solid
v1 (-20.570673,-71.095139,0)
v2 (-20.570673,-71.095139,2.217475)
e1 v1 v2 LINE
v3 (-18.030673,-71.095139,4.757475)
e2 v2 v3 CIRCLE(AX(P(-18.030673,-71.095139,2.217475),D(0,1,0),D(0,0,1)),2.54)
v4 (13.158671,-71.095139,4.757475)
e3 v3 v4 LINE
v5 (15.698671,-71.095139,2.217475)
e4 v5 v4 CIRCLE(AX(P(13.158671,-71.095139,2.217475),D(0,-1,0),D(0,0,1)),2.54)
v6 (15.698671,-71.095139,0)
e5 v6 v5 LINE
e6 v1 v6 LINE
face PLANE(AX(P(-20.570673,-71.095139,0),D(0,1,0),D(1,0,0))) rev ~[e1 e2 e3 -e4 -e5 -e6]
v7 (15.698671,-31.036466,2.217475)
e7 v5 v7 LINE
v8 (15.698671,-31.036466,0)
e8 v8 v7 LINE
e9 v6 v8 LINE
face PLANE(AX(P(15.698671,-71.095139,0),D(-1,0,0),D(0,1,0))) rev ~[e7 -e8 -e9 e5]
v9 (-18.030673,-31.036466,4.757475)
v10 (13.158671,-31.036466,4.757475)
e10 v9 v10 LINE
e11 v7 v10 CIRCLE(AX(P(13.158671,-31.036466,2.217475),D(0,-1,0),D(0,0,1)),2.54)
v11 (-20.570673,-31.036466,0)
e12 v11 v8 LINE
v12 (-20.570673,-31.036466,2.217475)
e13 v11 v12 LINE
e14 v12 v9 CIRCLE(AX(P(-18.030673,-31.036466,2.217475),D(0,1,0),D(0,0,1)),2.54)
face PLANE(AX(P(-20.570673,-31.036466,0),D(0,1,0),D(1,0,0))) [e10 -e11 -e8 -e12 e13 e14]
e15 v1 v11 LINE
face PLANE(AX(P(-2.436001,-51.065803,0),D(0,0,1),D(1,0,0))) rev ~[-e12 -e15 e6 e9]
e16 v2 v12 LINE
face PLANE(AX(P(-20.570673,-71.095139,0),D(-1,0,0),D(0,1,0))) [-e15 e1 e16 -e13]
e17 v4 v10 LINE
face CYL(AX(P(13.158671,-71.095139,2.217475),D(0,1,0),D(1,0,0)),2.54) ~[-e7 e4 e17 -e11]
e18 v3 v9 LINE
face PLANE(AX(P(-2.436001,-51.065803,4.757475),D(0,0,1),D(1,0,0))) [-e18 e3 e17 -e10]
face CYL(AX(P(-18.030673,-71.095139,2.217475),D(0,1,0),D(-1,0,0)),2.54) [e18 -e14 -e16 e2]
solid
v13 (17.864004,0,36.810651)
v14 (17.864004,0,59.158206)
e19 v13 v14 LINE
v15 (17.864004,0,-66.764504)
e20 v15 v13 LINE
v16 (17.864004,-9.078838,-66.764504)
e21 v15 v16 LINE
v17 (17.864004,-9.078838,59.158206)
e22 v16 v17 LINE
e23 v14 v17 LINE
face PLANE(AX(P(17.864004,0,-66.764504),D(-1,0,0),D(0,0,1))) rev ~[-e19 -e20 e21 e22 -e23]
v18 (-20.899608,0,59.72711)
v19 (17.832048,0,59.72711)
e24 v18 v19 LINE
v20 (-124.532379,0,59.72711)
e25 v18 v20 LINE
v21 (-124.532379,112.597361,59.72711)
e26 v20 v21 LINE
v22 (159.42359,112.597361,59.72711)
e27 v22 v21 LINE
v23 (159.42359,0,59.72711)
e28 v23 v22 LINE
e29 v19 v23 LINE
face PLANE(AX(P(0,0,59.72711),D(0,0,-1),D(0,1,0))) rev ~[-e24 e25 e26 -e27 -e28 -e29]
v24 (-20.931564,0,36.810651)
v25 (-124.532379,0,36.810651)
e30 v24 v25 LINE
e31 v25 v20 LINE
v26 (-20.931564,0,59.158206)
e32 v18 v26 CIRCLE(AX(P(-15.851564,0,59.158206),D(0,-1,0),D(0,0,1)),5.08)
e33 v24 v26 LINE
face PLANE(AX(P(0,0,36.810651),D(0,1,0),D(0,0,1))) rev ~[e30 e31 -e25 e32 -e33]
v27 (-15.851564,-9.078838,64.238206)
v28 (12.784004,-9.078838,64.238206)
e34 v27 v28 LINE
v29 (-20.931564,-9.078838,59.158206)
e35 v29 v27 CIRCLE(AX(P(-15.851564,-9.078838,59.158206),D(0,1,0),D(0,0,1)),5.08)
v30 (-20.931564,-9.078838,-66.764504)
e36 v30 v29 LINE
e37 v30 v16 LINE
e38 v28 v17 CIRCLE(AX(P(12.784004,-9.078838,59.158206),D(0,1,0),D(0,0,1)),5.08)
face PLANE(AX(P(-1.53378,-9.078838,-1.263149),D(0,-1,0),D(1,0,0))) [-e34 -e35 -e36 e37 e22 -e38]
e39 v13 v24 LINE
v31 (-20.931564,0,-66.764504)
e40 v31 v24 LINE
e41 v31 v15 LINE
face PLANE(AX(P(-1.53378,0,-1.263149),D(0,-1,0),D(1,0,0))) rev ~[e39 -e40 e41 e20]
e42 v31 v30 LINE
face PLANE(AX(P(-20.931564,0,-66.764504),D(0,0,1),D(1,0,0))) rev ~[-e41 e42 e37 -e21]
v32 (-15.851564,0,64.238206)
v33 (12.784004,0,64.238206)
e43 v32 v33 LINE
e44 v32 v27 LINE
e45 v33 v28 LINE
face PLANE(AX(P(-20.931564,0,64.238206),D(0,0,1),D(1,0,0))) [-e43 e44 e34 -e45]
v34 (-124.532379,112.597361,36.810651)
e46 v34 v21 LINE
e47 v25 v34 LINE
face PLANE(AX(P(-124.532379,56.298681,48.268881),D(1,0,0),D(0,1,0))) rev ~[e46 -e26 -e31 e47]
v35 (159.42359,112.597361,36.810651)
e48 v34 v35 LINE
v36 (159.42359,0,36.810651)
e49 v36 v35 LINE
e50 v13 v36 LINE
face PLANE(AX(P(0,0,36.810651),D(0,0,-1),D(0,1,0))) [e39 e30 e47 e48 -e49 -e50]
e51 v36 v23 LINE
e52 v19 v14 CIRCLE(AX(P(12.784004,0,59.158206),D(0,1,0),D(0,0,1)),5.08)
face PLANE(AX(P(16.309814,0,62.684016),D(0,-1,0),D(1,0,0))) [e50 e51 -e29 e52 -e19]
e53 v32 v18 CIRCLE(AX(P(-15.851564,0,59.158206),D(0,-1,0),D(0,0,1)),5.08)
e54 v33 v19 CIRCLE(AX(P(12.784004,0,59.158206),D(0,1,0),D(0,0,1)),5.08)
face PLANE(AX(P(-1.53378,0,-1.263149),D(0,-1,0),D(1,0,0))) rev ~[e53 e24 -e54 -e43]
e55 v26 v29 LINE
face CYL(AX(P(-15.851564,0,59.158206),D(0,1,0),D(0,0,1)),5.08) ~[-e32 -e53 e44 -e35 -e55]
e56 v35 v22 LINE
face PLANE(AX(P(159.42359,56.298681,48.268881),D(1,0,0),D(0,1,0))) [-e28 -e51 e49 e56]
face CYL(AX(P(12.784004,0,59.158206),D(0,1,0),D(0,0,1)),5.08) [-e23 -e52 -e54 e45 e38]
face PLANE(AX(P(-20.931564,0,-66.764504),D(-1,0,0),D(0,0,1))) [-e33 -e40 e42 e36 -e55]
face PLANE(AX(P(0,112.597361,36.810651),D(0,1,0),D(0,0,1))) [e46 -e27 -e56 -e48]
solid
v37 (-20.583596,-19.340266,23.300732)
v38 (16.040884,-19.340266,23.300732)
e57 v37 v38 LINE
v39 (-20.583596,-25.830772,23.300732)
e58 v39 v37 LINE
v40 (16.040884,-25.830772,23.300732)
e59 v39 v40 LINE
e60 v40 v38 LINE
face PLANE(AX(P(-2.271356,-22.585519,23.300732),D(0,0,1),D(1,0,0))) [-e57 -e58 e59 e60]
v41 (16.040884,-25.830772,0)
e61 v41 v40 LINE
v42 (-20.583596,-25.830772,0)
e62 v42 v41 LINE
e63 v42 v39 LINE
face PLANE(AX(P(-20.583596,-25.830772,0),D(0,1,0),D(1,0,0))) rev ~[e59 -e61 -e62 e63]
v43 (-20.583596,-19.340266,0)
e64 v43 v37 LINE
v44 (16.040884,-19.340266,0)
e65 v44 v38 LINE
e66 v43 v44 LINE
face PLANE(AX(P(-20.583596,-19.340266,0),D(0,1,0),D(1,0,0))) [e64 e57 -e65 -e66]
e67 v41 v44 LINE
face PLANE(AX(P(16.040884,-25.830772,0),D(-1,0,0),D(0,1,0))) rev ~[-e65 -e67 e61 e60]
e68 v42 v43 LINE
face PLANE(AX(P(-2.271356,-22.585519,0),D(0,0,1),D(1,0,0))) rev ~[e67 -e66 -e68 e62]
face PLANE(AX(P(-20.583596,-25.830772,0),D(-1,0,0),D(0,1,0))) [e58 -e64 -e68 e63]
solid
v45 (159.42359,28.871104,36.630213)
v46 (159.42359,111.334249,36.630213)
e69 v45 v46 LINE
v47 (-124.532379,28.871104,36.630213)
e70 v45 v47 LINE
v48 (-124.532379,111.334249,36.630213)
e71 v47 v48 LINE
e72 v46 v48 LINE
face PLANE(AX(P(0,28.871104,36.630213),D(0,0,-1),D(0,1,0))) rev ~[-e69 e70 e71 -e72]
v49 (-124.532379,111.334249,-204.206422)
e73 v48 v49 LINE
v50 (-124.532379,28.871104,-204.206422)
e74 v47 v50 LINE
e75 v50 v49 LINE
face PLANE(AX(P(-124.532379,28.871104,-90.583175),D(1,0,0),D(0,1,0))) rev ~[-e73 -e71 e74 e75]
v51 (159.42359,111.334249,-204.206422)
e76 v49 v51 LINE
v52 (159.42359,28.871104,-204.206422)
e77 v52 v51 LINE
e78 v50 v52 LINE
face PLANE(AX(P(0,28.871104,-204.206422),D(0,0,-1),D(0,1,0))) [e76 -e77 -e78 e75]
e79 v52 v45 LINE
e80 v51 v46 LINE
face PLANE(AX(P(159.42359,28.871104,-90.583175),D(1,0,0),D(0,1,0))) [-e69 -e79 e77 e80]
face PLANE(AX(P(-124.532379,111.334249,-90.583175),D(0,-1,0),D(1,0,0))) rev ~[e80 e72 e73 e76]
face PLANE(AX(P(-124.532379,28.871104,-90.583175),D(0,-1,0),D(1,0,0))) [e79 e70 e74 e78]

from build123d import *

# Parameters (mm, degrees)
F0_W         = 38.795568049
F0_H         = 131.0027092695
F1_DEPTH     = 9.0788379312
F2_W         = 36.6244800389
F2_H         = 6.4905062318
F3_DEPTH     = 23.3007315546
F4_W         = 36.2693443894
F4_H         = 40.0586724281
F5_DEPTH     = 4.7574751079
F6_R         = 2.54
F7_W         = 112.597361207
F7_H         = 22.9164585471
F9_DEPTH     = 159.4235897064
F8_W         = 82.463145256
F8_H         = 127.2133886814
F10_DEPTH    = 124.53237921
F12_DEPTH    = 113.6232465506
F13_T1_DEPTH = 21.7788379312


# Not quite as in the source:
# - a fillet or chamfer that OpenCascade refuses, or shapes differently, is made with other operations: its cross-section is extruded or revolved along the edge and cut away or added


with BuildPart() as f1:
    # F0 (on Front) → F1 (new body)
    with BuildSketch(Plane.XZ):
        with Locations((-1.533780247, -1.2631490827)):
            Rectangle(F0_W, F0_H)
    extrude(amount=F1_DEPTH)

    # F7 (on Right) → F9 (join)
    with BuildSketch(Plane.YZ):
        with Locations((56.2986806035, 48.2688806951)):
            Rectangle(F7_W, F7_H)
    extrude(amount=F9_DEPTH)

    # F10#2 (add): a face of the model
    f10_2_faces = [f1.faces().sort_by_distance(p)[0] for p in [
        (0, 56.2986806035, 48.2688806951),
    ]]
    extrude(f10_2_faces, amount=F10_DEPTH)


with BuildPart() as f3:
    # F2 (on Top) → F3 (new body)
    with BuildSketch(Plane.XY):
        with Locations((-2.2713560611, -22.5855186582)):
            Rectangle(F2_W, F2_H)
    extrude(amount=F3_DEPTH)


with BuildPart() as f5:
    # F4 (on Top) → F5 (new body)
    with BuildSketch(Plane.XY):
        with Locations((-2.4360008538, -51.0658025742)):
            Rectangle(F4_W, F4_H)
    extrude(amount=F5_DEPTH)

    # F6
    f6_edges = [f5.edges().sort_by_distance(p)[0] for p in [
        (15.698671, -51.065803, 4.757475),
        (-20.570673, -51.065803, 4.757475),
    ]]
    fillet(f6_edges, radius=F6_R)


with BuildPart() as f9:
    # F8 (on Right) → F9, piece 2 (new body)
    with BuildSketch(Plane.YZ):
        with Locations((70.1026767492, -26.9764810801)):
            Rectangle(F8_W, F8_H)
    extrude(amount=F9_DEPTH)

    # F10 (add): a face of the model
    f10_faces = [f9.faces().sort_by_distance(p)[0] for p in [
        (0, 70.1026767492, -26.9764810801),
    ]]
    extrude(f10_faces, amount=F10_DEPTH)

    # F11: union F1
    add(f1.part)

    # F12 (add): a face of the model
    f12_faces = [f9.faces().sort_by_distance(p)[0] for p in [
        (17.4456052482, 70.1026767492, -90.5831754208),
    ]]
    extrude(f12_faces, amount=F12_DEPTH)

    # F13: fillet of radius 5.08 on 2 edges, made by hand

    # F13_s2 → F13_t1 (cut)
    with BuildSketch(Plane.XZ):
        with BuildLine():
            ThreePointArc((12.7840037775, 64.2382055521), (16.3761062259, 62.7503080005), (17.8640037775, 59.1582055521))
            Line((17.8640037775, 59.1582055521), (17.8640037775, 64.2382055521))
            Line((17.8640037775, 64.2382055521), (12.7840037775, 64.2382055521))
        make_face()
        with BuildLine():
            ThreePointArc((-15.8515642715, 64.2382055521), (-19.4436667199, 62.7503080005), (-20.9315642715, 59.1582055521))
            Line((-20.9315642715, 59.1582055521), (-20.9315642715, 64.2382055521))
            Line((-20.9315642715, 64.2382055521), (-15.8515642715, 64.2382055521))
        make_face()
    extrude(amount=F13_T1_DEPTH, mode=Mode.SUBTRACT)


solid = Compound([f3.part, f5.part, f9.part])
